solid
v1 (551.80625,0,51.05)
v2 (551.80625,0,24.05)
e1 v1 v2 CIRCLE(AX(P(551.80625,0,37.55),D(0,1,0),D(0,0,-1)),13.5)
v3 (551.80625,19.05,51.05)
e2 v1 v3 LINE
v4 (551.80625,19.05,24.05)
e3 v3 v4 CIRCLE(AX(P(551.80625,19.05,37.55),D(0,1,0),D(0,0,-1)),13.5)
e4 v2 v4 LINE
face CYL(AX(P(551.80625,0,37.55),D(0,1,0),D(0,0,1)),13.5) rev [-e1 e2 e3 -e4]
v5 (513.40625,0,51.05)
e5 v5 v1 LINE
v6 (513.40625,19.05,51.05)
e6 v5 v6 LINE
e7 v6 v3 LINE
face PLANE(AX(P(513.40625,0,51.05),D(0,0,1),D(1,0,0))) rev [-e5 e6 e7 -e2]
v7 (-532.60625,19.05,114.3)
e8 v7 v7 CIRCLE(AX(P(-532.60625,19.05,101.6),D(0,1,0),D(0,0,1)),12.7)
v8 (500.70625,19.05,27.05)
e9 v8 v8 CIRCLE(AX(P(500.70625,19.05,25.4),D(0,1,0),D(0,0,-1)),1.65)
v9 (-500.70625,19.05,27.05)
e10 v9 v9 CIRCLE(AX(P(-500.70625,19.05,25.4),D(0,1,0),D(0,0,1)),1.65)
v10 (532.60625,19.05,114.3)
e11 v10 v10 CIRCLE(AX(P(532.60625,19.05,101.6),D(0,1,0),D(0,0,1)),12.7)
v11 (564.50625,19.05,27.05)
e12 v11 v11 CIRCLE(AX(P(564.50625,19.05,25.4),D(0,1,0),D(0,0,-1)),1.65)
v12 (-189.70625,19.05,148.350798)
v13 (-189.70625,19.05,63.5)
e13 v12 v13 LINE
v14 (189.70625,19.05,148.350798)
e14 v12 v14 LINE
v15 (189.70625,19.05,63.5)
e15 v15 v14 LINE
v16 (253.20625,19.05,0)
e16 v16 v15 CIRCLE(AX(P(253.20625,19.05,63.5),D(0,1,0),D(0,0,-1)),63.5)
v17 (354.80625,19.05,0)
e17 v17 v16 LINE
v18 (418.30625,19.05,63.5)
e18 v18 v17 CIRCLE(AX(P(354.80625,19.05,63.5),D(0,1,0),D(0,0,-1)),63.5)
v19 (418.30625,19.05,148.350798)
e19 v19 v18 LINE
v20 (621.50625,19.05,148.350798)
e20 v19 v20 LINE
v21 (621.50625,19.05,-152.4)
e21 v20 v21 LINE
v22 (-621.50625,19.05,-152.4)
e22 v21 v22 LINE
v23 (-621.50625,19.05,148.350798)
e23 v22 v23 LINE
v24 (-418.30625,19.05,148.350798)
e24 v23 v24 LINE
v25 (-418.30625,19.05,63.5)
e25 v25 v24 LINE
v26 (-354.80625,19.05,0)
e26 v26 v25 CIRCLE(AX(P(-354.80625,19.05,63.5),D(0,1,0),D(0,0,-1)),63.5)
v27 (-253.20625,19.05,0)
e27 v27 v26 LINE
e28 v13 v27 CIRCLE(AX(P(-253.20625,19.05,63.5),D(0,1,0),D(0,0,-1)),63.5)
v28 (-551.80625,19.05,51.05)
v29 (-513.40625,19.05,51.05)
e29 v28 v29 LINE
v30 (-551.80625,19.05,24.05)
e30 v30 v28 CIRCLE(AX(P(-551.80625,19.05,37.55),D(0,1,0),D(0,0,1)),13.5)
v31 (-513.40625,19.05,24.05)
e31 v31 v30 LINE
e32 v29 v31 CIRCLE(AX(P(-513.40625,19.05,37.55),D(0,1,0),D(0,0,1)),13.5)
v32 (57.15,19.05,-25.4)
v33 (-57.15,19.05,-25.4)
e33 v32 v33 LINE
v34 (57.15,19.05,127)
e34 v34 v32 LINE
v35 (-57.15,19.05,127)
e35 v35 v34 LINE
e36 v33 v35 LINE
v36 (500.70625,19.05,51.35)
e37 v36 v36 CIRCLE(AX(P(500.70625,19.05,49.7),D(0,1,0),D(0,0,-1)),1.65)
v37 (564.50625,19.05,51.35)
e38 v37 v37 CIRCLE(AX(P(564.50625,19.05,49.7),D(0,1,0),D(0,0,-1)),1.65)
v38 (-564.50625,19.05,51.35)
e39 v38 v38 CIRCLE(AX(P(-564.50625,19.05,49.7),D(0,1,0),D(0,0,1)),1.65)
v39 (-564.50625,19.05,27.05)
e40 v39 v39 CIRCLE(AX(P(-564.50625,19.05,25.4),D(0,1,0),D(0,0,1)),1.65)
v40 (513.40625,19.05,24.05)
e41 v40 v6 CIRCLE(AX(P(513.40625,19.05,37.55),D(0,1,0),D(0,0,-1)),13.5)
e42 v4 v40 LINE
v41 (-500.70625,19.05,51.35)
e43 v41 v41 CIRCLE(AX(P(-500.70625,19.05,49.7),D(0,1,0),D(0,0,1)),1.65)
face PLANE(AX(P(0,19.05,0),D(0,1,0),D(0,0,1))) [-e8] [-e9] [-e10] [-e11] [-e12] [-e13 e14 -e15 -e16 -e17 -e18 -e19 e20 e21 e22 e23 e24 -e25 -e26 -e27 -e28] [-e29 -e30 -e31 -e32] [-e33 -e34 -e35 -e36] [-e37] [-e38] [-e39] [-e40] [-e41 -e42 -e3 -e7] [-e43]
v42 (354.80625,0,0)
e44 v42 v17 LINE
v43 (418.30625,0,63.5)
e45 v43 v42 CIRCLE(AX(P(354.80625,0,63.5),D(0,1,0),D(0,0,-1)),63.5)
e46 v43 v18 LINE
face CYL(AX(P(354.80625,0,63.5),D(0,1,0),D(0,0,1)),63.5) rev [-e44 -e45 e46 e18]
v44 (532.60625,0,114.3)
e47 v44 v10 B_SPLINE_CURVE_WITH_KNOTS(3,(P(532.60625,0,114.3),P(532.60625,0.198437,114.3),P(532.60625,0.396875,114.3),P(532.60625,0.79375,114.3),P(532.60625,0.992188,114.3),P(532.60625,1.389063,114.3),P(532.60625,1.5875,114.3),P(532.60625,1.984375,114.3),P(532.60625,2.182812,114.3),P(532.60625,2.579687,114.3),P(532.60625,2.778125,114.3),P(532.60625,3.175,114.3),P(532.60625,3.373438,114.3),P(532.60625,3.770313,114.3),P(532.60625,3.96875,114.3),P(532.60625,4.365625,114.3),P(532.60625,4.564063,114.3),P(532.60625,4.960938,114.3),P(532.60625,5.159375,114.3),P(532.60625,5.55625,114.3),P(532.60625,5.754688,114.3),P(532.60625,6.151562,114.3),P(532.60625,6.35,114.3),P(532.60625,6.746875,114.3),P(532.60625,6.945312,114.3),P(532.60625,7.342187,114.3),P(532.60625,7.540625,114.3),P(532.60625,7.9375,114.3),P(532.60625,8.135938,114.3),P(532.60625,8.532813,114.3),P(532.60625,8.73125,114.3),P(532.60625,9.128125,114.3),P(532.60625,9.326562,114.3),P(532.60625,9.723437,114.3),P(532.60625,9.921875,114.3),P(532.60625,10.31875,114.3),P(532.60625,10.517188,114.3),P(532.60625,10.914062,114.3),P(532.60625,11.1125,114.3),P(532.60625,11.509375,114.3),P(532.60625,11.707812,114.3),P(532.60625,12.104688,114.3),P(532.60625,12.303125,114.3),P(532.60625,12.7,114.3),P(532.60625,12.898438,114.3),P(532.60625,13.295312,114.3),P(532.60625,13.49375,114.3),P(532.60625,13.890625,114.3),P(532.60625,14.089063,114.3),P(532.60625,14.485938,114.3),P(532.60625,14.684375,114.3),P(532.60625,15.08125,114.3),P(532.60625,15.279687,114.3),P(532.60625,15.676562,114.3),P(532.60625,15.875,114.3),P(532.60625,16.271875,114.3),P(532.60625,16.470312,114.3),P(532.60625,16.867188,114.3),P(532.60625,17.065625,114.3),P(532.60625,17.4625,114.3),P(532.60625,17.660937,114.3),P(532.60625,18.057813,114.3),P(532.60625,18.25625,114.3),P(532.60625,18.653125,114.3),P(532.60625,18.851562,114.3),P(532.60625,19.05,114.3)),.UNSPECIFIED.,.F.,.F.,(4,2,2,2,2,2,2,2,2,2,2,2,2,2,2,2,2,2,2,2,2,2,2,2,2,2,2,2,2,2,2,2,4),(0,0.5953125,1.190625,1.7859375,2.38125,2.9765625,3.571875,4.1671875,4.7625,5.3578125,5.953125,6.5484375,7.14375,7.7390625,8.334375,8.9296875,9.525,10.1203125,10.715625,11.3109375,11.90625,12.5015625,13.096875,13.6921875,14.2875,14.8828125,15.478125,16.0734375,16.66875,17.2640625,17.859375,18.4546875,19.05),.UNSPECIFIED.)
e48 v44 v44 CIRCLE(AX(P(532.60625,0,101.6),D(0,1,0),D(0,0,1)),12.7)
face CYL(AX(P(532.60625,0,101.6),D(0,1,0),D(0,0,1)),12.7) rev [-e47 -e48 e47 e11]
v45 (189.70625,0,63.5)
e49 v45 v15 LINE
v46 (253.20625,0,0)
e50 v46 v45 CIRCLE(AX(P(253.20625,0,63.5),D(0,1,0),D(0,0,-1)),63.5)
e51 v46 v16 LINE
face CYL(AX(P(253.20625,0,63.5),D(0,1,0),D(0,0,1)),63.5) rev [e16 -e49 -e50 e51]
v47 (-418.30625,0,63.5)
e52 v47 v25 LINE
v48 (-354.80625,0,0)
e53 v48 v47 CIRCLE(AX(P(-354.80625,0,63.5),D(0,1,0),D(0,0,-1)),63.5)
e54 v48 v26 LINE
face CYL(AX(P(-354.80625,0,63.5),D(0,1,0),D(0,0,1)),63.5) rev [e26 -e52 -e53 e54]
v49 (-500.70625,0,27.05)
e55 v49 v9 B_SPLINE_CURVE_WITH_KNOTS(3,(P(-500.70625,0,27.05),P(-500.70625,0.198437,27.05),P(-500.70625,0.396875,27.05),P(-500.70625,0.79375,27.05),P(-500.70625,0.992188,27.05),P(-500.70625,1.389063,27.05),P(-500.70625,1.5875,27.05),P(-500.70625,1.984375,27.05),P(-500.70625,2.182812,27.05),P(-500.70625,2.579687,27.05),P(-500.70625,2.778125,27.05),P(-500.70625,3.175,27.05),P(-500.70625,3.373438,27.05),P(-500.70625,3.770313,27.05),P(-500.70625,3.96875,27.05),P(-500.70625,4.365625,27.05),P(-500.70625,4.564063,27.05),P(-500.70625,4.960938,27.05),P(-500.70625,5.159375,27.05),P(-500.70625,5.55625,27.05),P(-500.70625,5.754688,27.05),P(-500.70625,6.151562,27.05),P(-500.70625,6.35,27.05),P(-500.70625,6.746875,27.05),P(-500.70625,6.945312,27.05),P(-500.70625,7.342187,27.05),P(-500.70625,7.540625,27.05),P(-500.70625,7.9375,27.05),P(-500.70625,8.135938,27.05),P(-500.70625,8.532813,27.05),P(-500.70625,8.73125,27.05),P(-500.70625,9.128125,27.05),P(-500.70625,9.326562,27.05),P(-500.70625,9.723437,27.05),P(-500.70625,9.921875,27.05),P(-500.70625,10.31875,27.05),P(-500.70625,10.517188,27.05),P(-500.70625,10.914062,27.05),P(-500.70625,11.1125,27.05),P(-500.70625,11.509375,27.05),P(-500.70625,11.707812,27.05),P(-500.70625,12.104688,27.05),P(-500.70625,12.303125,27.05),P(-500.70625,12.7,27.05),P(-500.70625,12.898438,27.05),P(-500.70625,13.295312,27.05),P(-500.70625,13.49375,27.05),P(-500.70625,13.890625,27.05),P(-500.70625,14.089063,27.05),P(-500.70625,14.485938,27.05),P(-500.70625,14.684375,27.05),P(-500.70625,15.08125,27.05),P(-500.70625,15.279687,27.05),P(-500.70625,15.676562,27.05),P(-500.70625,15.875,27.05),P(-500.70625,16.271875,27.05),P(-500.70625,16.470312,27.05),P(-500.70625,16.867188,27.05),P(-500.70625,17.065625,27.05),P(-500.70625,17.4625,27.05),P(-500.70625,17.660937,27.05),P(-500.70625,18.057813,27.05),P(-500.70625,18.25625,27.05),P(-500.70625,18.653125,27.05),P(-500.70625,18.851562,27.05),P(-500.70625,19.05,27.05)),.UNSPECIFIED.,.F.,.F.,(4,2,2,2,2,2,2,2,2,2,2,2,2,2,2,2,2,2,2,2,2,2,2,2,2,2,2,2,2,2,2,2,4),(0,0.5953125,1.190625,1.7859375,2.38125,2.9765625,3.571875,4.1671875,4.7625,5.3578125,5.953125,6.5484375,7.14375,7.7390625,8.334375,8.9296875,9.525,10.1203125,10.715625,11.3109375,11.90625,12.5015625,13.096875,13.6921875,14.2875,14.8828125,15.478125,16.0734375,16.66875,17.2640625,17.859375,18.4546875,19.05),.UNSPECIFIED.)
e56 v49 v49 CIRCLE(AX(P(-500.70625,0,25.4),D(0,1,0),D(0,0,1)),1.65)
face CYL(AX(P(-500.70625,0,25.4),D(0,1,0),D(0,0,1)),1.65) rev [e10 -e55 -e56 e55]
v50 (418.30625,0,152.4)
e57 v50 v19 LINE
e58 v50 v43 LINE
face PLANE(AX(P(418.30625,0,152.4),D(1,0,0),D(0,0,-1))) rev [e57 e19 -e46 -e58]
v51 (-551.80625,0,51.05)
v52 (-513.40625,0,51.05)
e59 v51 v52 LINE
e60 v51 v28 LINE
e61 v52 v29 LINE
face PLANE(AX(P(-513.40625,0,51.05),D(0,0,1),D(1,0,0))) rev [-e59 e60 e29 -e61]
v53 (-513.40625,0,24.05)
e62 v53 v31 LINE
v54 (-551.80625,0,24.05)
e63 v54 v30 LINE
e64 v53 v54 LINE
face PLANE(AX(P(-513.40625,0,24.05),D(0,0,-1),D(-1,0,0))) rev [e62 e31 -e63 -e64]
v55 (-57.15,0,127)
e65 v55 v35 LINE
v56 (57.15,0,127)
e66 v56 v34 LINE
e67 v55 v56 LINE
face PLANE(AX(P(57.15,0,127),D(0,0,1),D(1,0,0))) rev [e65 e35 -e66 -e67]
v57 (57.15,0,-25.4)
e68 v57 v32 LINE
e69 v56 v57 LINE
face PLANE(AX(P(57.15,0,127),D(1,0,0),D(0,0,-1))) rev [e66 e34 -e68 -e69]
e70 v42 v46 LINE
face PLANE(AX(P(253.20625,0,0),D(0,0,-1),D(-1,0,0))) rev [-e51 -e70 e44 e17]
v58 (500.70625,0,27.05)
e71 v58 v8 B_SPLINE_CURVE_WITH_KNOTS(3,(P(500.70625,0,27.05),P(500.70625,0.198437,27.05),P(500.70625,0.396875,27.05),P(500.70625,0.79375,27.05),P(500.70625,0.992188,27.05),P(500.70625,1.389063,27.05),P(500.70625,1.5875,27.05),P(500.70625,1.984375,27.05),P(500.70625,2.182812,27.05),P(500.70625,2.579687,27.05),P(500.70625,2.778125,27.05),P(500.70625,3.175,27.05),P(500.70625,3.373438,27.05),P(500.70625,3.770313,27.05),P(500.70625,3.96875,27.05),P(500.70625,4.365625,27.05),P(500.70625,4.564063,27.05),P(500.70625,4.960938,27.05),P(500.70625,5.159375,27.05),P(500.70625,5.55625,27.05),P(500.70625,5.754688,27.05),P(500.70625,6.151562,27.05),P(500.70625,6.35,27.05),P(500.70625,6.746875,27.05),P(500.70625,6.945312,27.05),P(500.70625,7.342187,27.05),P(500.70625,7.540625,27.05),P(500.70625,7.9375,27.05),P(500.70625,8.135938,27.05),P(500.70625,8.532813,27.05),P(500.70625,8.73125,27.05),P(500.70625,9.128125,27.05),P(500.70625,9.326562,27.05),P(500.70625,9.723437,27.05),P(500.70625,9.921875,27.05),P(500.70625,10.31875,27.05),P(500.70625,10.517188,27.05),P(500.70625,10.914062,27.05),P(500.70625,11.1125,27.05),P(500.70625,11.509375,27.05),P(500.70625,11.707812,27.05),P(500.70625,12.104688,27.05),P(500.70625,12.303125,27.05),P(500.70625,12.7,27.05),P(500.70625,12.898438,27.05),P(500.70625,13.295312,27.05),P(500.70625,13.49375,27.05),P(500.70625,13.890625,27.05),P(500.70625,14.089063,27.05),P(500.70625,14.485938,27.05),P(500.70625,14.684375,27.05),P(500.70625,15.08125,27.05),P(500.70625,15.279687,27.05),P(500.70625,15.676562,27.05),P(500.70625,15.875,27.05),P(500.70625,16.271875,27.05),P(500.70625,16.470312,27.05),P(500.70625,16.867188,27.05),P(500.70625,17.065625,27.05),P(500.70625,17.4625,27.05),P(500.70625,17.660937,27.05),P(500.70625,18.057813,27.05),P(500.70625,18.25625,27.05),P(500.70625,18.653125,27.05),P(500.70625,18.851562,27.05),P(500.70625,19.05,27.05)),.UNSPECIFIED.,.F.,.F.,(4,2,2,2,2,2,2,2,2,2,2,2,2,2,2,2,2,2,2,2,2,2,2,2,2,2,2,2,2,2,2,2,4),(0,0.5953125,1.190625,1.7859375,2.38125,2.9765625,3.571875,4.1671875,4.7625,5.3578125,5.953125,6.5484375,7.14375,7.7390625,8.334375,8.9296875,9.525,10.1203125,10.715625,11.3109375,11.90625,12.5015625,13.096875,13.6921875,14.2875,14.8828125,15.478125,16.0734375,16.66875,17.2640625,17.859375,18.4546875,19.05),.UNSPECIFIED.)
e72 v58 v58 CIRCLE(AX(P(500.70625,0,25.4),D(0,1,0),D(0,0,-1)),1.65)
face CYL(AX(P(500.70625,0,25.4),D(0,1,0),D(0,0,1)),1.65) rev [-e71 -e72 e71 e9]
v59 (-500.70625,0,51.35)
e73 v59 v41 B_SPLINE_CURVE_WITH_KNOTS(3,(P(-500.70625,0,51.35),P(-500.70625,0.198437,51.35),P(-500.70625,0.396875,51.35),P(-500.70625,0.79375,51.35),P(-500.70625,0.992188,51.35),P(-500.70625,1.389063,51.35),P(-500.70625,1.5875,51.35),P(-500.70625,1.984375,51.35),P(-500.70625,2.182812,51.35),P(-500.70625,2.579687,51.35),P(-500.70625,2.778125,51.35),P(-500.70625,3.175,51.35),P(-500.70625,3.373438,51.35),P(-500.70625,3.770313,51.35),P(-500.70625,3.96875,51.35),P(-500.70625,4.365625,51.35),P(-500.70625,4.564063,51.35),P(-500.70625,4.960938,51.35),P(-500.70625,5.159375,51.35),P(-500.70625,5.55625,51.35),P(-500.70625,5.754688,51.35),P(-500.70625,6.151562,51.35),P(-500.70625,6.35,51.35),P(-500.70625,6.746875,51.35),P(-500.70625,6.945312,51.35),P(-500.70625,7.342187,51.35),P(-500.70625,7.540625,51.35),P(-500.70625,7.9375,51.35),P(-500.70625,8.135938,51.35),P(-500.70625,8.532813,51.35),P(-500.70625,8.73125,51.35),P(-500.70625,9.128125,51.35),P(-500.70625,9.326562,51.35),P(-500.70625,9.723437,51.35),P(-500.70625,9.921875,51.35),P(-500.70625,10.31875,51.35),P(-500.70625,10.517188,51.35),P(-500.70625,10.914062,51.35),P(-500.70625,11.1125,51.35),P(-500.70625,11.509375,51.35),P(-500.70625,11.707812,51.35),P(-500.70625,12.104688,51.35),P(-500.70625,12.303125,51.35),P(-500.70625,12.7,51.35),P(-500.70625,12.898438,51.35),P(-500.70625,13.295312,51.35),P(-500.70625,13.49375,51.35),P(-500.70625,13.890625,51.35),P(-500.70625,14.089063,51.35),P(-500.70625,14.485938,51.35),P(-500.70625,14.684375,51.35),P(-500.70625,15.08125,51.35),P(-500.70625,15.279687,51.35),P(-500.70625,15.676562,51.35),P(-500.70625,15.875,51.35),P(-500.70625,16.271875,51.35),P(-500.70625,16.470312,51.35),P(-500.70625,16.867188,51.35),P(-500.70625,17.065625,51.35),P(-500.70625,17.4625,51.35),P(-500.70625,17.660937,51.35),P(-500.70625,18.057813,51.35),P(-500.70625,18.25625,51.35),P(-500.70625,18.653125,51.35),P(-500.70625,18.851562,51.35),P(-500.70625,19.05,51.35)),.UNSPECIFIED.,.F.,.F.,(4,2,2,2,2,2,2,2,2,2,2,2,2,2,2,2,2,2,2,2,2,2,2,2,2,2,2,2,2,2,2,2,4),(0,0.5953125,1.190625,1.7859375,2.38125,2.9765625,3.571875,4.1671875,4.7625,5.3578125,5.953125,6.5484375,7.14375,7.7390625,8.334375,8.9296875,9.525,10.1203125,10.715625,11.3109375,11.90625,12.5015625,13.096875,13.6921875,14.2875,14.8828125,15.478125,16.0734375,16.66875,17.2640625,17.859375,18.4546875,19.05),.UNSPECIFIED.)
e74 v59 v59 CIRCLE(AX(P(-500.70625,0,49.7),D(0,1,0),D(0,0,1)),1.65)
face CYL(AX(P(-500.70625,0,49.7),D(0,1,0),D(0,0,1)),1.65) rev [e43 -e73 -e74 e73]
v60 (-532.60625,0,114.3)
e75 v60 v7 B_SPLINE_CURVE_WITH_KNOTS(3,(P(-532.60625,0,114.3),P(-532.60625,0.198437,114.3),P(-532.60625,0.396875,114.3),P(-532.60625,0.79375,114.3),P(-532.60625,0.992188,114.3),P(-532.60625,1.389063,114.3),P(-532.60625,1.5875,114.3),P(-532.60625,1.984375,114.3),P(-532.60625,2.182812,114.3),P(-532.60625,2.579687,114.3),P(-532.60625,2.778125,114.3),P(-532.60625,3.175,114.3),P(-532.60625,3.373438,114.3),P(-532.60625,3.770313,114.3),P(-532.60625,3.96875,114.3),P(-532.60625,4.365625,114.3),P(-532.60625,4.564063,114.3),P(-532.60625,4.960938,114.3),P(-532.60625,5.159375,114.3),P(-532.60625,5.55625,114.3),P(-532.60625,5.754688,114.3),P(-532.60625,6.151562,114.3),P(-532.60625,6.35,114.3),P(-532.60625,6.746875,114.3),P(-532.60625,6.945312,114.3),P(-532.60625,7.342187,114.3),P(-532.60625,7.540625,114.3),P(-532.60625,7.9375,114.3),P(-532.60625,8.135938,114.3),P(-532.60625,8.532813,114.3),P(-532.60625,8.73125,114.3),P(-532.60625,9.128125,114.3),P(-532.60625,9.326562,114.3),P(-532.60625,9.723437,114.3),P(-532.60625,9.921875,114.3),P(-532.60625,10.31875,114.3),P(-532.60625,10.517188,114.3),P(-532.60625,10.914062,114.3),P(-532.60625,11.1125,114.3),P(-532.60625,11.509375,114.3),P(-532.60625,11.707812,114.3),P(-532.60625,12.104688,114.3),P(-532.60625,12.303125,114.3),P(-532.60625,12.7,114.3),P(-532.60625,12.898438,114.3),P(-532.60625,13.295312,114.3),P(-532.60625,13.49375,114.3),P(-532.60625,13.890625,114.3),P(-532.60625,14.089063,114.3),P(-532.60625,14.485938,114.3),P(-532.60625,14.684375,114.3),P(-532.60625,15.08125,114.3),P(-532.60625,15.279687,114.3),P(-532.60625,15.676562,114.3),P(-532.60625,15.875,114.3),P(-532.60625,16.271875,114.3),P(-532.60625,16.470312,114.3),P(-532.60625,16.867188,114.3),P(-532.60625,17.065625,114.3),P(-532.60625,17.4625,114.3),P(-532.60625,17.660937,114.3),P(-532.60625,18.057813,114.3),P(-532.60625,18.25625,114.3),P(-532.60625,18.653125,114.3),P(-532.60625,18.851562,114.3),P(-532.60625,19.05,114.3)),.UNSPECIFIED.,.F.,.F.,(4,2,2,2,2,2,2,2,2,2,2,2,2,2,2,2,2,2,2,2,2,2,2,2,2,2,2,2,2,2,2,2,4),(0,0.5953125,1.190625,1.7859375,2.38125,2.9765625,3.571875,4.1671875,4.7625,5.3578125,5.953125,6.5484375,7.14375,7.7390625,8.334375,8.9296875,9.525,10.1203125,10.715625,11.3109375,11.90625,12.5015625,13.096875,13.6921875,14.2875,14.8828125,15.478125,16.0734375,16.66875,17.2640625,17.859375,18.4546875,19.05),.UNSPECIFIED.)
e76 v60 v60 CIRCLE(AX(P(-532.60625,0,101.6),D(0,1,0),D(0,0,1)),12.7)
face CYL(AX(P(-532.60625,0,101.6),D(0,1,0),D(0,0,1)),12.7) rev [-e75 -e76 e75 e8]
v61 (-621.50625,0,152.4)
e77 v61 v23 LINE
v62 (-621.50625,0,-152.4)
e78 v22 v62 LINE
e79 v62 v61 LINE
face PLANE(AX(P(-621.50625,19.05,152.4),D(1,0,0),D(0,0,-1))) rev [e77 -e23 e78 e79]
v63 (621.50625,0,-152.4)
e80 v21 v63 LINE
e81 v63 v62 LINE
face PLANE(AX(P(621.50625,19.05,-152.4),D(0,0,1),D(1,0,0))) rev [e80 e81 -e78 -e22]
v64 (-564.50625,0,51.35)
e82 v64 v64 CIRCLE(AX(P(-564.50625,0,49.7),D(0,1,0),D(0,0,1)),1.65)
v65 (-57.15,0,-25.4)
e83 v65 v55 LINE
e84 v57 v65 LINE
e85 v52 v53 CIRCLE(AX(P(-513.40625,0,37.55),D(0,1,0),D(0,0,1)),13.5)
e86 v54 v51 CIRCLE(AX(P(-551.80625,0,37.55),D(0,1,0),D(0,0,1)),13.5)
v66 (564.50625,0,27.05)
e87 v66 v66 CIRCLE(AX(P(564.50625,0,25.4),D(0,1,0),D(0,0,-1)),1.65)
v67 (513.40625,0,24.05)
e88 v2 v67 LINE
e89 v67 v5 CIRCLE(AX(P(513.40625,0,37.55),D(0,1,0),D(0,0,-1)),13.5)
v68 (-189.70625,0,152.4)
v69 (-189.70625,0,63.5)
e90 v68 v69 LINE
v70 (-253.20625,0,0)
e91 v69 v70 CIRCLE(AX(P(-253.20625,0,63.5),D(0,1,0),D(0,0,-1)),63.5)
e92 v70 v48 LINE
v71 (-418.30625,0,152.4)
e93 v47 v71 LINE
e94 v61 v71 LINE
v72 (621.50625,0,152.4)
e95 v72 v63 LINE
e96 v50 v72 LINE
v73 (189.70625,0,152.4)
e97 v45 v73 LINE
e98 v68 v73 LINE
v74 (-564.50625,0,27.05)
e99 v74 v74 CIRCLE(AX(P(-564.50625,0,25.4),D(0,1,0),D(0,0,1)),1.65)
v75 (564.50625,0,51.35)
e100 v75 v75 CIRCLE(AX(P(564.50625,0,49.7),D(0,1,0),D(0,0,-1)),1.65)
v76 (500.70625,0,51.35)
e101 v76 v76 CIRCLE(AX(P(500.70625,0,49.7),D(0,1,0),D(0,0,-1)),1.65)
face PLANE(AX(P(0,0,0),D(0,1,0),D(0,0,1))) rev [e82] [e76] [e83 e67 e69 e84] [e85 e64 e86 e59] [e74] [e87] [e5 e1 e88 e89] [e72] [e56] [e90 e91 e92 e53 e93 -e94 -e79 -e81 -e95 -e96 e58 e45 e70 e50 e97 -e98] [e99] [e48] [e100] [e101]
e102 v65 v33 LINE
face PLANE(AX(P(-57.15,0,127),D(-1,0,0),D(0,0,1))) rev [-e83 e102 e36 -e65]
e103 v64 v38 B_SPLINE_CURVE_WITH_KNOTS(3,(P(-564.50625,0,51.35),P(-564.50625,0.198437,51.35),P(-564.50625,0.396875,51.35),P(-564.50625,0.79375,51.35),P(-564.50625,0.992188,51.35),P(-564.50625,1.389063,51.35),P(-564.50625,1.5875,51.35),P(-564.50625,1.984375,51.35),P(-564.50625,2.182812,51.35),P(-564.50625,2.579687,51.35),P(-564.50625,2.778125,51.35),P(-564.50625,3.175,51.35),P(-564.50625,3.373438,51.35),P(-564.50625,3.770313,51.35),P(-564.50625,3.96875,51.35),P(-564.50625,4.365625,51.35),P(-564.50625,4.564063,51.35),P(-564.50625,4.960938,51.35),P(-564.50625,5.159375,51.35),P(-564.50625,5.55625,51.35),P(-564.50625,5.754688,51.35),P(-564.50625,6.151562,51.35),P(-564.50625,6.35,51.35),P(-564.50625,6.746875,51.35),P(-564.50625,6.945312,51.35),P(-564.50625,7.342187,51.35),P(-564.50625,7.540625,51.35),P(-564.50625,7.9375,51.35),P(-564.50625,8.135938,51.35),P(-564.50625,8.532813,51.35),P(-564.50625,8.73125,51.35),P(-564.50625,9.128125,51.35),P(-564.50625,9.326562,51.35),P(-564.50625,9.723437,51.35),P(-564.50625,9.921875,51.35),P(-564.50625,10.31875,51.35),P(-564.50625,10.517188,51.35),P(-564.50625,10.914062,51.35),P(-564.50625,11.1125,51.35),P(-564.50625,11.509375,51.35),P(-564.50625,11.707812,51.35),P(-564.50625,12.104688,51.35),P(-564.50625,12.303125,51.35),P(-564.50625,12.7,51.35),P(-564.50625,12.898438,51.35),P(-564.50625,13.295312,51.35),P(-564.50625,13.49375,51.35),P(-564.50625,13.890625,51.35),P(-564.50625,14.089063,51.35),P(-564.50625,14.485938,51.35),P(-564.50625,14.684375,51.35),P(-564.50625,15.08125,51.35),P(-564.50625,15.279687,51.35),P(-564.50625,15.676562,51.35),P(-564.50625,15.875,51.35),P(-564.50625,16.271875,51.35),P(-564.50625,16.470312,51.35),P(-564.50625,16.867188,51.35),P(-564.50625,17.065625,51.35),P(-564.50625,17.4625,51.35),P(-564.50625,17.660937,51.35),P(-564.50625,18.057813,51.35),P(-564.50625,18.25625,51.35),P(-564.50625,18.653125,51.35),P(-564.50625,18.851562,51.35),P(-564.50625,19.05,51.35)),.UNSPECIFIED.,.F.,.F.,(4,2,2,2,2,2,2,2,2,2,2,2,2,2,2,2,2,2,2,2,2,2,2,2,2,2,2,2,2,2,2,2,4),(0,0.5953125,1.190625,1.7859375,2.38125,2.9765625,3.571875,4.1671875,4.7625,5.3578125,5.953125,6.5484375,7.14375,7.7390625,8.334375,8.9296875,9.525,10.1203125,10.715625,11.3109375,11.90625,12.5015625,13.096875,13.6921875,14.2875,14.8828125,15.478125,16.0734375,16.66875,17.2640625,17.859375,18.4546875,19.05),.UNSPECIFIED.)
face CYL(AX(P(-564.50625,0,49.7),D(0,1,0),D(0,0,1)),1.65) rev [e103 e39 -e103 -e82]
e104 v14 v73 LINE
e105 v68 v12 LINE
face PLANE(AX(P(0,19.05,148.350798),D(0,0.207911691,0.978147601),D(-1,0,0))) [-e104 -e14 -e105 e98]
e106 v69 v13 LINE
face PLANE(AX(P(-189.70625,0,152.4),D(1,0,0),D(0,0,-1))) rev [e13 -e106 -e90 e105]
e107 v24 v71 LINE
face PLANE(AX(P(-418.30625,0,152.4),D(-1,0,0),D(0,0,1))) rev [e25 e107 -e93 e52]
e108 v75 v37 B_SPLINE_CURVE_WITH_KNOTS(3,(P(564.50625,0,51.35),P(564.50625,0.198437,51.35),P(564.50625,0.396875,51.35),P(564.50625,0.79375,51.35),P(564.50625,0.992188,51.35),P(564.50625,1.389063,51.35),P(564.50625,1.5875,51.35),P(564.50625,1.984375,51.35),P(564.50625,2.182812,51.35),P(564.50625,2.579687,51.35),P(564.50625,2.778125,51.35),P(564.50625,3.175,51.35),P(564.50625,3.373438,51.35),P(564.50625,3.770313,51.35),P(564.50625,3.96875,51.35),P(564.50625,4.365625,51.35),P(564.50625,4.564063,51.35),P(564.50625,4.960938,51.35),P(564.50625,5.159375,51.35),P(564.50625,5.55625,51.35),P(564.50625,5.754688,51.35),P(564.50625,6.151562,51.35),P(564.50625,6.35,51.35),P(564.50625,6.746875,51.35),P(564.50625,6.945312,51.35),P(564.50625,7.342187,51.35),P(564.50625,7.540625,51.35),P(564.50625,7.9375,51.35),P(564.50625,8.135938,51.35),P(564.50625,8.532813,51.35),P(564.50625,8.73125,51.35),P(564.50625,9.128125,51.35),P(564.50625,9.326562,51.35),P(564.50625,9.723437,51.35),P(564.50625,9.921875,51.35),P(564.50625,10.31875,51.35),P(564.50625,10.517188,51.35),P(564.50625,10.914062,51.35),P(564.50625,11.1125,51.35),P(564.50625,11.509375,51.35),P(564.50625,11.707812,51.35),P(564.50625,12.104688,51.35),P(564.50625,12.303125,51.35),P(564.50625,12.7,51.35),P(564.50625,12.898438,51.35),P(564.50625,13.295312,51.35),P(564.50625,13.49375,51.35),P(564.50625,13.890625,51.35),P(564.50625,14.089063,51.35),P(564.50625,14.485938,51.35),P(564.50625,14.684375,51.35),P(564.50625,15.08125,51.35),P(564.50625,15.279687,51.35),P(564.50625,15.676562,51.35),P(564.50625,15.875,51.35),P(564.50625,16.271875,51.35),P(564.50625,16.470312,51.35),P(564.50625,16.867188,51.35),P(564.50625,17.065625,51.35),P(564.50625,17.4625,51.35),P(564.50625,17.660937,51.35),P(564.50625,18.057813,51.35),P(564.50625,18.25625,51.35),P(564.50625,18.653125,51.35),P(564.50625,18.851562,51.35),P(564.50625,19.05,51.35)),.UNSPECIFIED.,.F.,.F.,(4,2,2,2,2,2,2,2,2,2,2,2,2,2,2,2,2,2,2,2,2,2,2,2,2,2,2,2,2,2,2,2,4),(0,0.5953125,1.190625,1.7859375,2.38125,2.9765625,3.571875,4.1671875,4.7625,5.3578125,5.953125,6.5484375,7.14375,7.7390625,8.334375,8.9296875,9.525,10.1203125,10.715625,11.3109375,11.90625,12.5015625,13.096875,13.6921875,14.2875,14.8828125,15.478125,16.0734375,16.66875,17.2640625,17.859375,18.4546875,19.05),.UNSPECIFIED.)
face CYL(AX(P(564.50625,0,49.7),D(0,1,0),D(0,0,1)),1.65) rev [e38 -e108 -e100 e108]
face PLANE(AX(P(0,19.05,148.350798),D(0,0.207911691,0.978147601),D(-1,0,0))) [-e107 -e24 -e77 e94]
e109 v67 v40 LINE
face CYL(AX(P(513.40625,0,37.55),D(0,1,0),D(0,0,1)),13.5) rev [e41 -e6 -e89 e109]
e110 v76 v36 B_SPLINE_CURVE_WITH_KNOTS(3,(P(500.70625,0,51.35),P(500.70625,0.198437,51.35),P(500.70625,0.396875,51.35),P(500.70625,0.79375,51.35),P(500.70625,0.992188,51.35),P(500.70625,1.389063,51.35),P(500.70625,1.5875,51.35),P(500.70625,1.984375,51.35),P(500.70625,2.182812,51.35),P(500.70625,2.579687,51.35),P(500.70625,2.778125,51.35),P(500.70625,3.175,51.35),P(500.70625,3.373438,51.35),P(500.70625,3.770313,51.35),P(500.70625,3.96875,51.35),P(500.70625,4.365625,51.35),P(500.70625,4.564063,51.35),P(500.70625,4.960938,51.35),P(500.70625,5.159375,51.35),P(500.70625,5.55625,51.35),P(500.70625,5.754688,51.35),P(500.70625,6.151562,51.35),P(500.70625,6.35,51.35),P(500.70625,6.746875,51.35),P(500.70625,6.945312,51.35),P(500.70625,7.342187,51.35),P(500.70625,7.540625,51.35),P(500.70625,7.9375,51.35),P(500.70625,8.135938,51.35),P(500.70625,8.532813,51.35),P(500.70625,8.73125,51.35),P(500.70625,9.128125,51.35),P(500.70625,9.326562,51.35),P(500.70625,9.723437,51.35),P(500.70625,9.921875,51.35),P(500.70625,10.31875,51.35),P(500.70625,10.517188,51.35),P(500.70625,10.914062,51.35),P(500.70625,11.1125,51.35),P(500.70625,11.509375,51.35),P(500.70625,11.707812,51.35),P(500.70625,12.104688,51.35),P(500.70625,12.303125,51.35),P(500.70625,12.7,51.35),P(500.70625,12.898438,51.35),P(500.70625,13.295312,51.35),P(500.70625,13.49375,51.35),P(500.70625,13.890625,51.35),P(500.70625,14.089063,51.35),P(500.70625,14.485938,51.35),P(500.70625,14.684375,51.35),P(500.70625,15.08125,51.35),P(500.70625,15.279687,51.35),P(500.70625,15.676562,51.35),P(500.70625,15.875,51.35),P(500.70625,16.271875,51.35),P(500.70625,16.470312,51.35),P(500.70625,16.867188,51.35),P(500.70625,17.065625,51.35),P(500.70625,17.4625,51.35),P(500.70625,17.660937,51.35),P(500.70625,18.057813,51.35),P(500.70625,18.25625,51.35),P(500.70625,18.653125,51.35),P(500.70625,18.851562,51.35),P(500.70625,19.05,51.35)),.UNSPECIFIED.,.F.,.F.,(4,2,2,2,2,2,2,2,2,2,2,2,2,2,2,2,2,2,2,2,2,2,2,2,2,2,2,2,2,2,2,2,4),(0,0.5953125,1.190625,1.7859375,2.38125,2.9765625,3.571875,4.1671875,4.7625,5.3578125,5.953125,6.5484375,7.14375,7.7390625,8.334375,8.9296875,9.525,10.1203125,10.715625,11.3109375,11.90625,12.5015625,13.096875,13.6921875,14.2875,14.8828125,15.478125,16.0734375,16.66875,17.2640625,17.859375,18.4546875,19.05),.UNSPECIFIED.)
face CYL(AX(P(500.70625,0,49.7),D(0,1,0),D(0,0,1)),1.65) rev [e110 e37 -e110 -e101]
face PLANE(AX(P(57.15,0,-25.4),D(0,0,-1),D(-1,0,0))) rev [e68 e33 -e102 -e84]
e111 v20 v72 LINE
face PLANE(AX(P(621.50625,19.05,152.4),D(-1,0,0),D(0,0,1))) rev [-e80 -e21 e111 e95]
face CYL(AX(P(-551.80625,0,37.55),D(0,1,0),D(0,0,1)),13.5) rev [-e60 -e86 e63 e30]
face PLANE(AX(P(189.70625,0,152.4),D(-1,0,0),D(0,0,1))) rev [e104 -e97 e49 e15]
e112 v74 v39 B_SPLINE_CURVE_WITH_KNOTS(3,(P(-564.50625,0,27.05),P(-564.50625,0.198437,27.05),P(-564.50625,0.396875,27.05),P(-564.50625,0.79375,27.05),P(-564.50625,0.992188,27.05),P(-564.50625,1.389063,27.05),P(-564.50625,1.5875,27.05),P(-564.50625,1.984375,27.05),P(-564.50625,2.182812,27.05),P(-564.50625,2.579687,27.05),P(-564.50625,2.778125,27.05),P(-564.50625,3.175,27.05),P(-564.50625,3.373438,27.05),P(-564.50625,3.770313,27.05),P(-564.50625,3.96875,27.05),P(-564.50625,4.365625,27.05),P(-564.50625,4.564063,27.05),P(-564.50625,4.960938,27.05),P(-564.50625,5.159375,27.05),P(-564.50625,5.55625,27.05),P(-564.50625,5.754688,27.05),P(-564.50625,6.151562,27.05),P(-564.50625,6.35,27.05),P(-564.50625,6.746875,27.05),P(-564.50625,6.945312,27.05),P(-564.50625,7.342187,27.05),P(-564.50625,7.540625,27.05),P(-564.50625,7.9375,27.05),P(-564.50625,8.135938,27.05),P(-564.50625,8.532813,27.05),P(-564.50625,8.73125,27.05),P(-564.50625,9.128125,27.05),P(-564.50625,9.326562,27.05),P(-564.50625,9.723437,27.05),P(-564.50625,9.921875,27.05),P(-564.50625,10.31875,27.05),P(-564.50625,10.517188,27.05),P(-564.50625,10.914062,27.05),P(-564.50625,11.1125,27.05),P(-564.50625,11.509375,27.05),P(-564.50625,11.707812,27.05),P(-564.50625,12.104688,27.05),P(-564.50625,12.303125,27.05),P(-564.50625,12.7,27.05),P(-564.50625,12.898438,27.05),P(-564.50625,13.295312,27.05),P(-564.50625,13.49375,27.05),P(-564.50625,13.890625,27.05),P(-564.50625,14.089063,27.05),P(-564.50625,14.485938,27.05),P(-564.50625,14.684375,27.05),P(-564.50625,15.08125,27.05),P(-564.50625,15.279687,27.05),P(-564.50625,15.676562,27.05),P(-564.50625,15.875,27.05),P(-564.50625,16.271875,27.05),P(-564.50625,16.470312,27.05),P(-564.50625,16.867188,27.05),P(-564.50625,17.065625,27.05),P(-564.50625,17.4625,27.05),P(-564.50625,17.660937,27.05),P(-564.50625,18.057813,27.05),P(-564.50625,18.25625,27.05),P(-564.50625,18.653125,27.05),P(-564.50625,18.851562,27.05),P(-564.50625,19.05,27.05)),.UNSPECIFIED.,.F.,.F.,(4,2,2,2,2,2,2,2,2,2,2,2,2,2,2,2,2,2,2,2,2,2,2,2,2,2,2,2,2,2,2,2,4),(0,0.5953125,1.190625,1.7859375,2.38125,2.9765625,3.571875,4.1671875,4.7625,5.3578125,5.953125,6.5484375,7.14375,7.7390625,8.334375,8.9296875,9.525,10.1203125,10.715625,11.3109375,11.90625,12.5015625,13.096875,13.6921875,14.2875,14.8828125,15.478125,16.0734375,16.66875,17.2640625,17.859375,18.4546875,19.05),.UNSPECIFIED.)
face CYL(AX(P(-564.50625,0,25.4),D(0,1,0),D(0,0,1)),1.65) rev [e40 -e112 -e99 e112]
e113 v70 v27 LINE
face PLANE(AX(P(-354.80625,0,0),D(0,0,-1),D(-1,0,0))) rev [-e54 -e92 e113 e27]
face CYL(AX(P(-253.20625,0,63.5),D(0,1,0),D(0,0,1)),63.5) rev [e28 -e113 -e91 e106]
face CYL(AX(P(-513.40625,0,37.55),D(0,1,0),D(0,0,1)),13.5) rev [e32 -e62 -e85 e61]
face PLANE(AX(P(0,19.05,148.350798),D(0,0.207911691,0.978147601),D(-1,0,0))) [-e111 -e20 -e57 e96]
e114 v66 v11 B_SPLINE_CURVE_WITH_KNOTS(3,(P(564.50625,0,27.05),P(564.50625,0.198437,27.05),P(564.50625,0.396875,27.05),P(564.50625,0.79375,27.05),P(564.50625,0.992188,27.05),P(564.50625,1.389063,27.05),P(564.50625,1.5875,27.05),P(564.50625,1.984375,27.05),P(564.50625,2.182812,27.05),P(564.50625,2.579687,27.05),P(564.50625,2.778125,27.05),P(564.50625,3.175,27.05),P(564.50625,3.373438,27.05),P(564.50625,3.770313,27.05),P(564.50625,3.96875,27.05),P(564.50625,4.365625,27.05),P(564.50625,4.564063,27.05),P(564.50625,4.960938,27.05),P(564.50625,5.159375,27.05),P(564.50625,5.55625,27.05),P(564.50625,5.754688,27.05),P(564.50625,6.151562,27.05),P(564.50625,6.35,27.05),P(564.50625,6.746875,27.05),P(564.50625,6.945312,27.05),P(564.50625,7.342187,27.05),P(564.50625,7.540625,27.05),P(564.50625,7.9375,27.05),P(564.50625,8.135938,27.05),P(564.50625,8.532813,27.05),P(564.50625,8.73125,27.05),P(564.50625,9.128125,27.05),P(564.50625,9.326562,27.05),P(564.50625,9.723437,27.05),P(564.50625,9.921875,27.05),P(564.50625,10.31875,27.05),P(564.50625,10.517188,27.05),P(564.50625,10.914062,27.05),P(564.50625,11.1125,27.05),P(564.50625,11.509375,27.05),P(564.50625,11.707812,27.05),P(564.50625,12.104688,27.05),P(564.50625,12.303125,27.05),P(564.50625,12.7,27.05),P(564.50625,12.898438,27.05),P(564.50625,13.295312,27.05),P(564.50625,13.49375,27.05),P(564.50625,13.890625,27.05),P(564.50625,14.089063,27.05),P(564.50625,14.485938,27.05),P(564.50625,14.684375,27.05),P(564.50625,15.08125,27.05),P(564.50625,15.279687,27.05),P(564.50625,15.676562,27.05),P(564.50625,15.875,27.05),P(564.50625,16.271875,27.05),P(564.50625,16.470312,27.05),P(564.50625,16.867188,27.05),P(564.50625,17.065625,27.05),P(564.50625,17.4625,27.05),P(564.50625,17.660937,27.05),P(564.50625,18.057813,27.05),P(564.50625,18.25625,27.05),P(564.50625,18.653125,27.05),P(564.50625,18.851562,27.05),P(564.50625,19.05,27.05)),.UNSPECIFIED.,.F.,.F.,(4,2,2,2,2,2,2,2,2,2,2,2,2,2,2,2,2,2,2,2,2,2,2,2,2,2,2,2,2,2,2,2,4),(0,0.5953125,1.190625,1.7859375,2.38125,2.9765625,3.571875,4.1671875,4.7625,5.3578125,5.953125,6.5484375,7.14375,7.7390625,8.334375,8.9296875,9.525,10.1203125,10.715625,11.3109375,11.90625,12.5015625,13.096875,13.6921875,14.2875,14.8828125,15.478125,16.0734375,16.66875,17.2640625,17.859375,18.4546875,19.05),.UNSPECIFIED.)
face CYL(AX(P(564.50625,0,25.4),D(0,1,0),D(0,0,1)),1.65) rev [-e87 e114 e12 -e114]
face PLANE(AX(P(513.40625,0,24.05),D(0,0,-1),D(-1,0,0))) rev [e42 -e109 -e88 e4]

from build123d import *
from OCP.BRepFilletAPI import BRepFilletAPI_MakeChamfer

# Parameters (mm, degrees)
SKETCH1_W           = 1243.0125
SKETCH1_H           = 304.8
BOSS_EXTRUDE1_DEPTH = 19.05
CUT_EXTRUDE2_DEPTH  = 641.202062859
SKETCH5_W           = 114.3
SKETCH5_H           = 152.4
CUT_EXTRUDE3_DEPTH  = 641.202062859
SKETCH6_R           = 12.7
CUT_EXTRUDE4_DEPTH  = 641.202062859
CHAMFER1_SIZE       = 19.05
CHAMFER1_SIZE_2     = 4.0492025
SKETCH8_R           = 1.65
CUT_EXTRUDE5_DEPTH  = 641.202062859


with BuildPart() as part:
    # Sketch1 → Boss-Extrude1 (new body)
    with BuildSketch(Plane(origin=(0, 0, 0), x_dir=(1, 0, 0), z_dir=(0, 1, 0))):
        Rectangle(SKETCH1_W, SKETCH1_H)
    extrude(amount=BOSS_EXTRUDE1_DEPTH)

    # Sketch4 → Cut-Extrude2 (cut, through all)
    with BuildSketch(Plane(origin=(0, 19.05, 0), x_dir=(1, 0, 0), z_dir=(0, 1, 0))):
        with BuildLine():
            Line((-418.30625, -152.4), (-418.30625, -63.5))
            ThreePointArc((-418.30625, -63.5), (-399.707530605, -18.598719395), (-354.80625, 0))
            Line((-354.80625, 0), (-253.20625, 0))
            ThreePointArc((-253.20625, 0), (-208.304969395, -18.598719395), (-189.70625, -63.5))
            Line((-189.70625, -63.5), (-189.70625, -152.4))
            Line((-189.70625, -152.4), (-418.30625, -152.4))
        make_face()
        with BuildLine():
            Line((189.70625, -152.4), (189.70625, -63.5))
            ThreePointArc((189.70625, -63.5), (208.304969395, -18.598719395), (253.20625, 0))
            Line((253.20625, 0), (354.80625, 0))
            ThreePointArc((354.80625, 0), (399.707530605, -18.598719395), (418.30625, -63.5))
            Line((418.30625, -63.5), (418.30625, -152.4))
            Line((418.30625, -152.4), (189.70625, -152.4))
        make_face()
    extrude(amount=-CUT_EXTRUDE2_DEPTH, mode=Mode.SUBTRACT)

    # Sketch5 → Cut-Extrude3 (cut, through all)
    with BuildSketch(Plane(origin=(0, 19.05, 0), x_dir=(1, 0, 0), z_dir=(0, 1, 0))):
        with Locations((0, -50.8)):
            Rectangle(SKETCH5_W, SKETCH5_H)
    extrude(amount=-CUT_EXTRUDE3_DEPTH, mode=Mode.SUBTRACT)

    # Sketch6 → Cut-Extrude4 (cut, through all)
    with BuildSketch(Plane(origin=(0, 19.05, 0), x_dir=(1, 0, 0), z_dir=(0, 1, 0))):
        with Locations(Location((-532.60625, -101.6, 0), (0, 0, 270))):
            Circle(SKETCH6_R)
        with Locations(Location((532.60625, -101.6, 0), (0, 0, 270))):
            Circle(SKETCH6_R)
    extrude(amount=-CUT_EXTRUDE4_DEPTH, mode=Mode.SUBTRACT)

    # Chamfer1
    chamfer1_edges_1 = [part.edges().sort_by_distance(p)[0] for p in [
        (519.90625, 19.05, 152.4),
    ]]
    chamfer1_side_1 = [part.faces().sort_by_distance(p)[0] for p in [
        (519.90625, 18.96901595, 152.4),
    ]]
    chamfer1_edges_2 = [part.edges().sort_by_distance(p)[0] for p in [
        (0, 19.05, 152.4),
    ]]
    chamfer1_side_2 = [part.faces().sort_by_distance(p)[0] for p in [
        (0, 19.05, 152.31901595),
    ]]
    chamfer1_edges_3 = [part.edges().sort_by_distance(p)[0] for p in [
        (-519.90625, 19.05, 152.4),
    ]]
    chamfer1_side_3 = [part.faces().sort_by_distance(p)[0] for p in [
        (-519.90625, 19.05, 152.31901595),
    ]]
    chamfer1 = BRepFilletAPI_MakeChamfer(part.part.solid().wrapped)
    for e in chamfer1_edges_1:
        chamfer1.Add(CHAMFER1_SIZE - 0.0001, CHAMFER1_SIZE_2 - 0.0001, e.wrapped, chamfer1_side_1[0].wrapped)
    for e in chamfer1_edges_2:
        chamfer1.Add(CHAMFER1_SIZE_2 - 0.0001, CHAMFER1_SIZE - 0.0001, e.wrapped, chamfer1_side_2[0].wrapped)
    for e in chamfer1_edges_3:
        chamfer1.Add(CHAMFER1_SIZE_2 - 0.0001, CHAMFER1_SIZE - 0.0001, e.wrapped, chamfer1_side_3[0].wrapped)
    add(Compound.cast(chamfer1.Shape()), mode=Mode.REPLACE)  # a hair under: the kernel refuses the full size

    # Sketch8 → Cut-Extrude5 (cut, through all)
    with BuildSketch(Plane(origin=(0, 19.05, 0), x_dir=(1, 0, 0), z_dir=(0, 1, 0))):
        with Locations(Location((-564.50625, -25.4, 0), (0, 0, 270))):
            Circle(SKETCH8_R)
        with Locations(Location((-564.50625, -49.7, 0), (0, 0, 270))):
            Circle(SKETCH8_R)
        with Locations(Location((-500.70625, -49.7, 0), (0, 0, 270))):
            Circle(SKETCH8_R)
        with Locations(Location((-500.70625, -25.4, 0), (0, 0, 270))):
            Circle(SKETCH8_R)
        with Locations(Location((500.70625, -25.4, 0), (0, 0, 270))):
            Circle(SKETCH8_R)
        with Locations(Location((500.70625, -49.7, 0), (0, 0, 270))):
            Circle(SKETCH8_R)
        with Locations(Location((564.50625, -49.7, 0), (0, 0, 270))):
            Circle(SKETCH8_R)
        with Locations(Location((564.50625, -25.4, 0), (0, 0, 270))):
            Circle(SKETCH8_R)
        with BuildLine():
            Line((-513.40625, -51.05), (-551.80625, -51.05))
            ThreePointArc((-551.80625, -51.05), (-565.30625, -37.55), (-551.80625, -24.05))
            Line((-551.80625, -24.05), (-513.40625, -24.05))
            ThreePointArc((-513.40625, -24.05), (-499.90625, -37.55), (-513.40625, -51.05))
        make_face()
        with BuildLine():
            Line((513.40625, -51.05), (551.80625, -51.05))
            ThreePointArc((551.80625, -51.05), (565.30625, -37.55), (551.80625, -24.05))
            Line((551.80625, -24.05), (513.40625, -24.05))
            ThreePointArc((513.40625, -24.05), (499.90625, -37.55), (513.40625, -51.05))
        make_face()
    extrude(amount=-CUT_EXTRUDE5_DEPTH, mode=Mode.SUBTRACT)


solid = part.part
